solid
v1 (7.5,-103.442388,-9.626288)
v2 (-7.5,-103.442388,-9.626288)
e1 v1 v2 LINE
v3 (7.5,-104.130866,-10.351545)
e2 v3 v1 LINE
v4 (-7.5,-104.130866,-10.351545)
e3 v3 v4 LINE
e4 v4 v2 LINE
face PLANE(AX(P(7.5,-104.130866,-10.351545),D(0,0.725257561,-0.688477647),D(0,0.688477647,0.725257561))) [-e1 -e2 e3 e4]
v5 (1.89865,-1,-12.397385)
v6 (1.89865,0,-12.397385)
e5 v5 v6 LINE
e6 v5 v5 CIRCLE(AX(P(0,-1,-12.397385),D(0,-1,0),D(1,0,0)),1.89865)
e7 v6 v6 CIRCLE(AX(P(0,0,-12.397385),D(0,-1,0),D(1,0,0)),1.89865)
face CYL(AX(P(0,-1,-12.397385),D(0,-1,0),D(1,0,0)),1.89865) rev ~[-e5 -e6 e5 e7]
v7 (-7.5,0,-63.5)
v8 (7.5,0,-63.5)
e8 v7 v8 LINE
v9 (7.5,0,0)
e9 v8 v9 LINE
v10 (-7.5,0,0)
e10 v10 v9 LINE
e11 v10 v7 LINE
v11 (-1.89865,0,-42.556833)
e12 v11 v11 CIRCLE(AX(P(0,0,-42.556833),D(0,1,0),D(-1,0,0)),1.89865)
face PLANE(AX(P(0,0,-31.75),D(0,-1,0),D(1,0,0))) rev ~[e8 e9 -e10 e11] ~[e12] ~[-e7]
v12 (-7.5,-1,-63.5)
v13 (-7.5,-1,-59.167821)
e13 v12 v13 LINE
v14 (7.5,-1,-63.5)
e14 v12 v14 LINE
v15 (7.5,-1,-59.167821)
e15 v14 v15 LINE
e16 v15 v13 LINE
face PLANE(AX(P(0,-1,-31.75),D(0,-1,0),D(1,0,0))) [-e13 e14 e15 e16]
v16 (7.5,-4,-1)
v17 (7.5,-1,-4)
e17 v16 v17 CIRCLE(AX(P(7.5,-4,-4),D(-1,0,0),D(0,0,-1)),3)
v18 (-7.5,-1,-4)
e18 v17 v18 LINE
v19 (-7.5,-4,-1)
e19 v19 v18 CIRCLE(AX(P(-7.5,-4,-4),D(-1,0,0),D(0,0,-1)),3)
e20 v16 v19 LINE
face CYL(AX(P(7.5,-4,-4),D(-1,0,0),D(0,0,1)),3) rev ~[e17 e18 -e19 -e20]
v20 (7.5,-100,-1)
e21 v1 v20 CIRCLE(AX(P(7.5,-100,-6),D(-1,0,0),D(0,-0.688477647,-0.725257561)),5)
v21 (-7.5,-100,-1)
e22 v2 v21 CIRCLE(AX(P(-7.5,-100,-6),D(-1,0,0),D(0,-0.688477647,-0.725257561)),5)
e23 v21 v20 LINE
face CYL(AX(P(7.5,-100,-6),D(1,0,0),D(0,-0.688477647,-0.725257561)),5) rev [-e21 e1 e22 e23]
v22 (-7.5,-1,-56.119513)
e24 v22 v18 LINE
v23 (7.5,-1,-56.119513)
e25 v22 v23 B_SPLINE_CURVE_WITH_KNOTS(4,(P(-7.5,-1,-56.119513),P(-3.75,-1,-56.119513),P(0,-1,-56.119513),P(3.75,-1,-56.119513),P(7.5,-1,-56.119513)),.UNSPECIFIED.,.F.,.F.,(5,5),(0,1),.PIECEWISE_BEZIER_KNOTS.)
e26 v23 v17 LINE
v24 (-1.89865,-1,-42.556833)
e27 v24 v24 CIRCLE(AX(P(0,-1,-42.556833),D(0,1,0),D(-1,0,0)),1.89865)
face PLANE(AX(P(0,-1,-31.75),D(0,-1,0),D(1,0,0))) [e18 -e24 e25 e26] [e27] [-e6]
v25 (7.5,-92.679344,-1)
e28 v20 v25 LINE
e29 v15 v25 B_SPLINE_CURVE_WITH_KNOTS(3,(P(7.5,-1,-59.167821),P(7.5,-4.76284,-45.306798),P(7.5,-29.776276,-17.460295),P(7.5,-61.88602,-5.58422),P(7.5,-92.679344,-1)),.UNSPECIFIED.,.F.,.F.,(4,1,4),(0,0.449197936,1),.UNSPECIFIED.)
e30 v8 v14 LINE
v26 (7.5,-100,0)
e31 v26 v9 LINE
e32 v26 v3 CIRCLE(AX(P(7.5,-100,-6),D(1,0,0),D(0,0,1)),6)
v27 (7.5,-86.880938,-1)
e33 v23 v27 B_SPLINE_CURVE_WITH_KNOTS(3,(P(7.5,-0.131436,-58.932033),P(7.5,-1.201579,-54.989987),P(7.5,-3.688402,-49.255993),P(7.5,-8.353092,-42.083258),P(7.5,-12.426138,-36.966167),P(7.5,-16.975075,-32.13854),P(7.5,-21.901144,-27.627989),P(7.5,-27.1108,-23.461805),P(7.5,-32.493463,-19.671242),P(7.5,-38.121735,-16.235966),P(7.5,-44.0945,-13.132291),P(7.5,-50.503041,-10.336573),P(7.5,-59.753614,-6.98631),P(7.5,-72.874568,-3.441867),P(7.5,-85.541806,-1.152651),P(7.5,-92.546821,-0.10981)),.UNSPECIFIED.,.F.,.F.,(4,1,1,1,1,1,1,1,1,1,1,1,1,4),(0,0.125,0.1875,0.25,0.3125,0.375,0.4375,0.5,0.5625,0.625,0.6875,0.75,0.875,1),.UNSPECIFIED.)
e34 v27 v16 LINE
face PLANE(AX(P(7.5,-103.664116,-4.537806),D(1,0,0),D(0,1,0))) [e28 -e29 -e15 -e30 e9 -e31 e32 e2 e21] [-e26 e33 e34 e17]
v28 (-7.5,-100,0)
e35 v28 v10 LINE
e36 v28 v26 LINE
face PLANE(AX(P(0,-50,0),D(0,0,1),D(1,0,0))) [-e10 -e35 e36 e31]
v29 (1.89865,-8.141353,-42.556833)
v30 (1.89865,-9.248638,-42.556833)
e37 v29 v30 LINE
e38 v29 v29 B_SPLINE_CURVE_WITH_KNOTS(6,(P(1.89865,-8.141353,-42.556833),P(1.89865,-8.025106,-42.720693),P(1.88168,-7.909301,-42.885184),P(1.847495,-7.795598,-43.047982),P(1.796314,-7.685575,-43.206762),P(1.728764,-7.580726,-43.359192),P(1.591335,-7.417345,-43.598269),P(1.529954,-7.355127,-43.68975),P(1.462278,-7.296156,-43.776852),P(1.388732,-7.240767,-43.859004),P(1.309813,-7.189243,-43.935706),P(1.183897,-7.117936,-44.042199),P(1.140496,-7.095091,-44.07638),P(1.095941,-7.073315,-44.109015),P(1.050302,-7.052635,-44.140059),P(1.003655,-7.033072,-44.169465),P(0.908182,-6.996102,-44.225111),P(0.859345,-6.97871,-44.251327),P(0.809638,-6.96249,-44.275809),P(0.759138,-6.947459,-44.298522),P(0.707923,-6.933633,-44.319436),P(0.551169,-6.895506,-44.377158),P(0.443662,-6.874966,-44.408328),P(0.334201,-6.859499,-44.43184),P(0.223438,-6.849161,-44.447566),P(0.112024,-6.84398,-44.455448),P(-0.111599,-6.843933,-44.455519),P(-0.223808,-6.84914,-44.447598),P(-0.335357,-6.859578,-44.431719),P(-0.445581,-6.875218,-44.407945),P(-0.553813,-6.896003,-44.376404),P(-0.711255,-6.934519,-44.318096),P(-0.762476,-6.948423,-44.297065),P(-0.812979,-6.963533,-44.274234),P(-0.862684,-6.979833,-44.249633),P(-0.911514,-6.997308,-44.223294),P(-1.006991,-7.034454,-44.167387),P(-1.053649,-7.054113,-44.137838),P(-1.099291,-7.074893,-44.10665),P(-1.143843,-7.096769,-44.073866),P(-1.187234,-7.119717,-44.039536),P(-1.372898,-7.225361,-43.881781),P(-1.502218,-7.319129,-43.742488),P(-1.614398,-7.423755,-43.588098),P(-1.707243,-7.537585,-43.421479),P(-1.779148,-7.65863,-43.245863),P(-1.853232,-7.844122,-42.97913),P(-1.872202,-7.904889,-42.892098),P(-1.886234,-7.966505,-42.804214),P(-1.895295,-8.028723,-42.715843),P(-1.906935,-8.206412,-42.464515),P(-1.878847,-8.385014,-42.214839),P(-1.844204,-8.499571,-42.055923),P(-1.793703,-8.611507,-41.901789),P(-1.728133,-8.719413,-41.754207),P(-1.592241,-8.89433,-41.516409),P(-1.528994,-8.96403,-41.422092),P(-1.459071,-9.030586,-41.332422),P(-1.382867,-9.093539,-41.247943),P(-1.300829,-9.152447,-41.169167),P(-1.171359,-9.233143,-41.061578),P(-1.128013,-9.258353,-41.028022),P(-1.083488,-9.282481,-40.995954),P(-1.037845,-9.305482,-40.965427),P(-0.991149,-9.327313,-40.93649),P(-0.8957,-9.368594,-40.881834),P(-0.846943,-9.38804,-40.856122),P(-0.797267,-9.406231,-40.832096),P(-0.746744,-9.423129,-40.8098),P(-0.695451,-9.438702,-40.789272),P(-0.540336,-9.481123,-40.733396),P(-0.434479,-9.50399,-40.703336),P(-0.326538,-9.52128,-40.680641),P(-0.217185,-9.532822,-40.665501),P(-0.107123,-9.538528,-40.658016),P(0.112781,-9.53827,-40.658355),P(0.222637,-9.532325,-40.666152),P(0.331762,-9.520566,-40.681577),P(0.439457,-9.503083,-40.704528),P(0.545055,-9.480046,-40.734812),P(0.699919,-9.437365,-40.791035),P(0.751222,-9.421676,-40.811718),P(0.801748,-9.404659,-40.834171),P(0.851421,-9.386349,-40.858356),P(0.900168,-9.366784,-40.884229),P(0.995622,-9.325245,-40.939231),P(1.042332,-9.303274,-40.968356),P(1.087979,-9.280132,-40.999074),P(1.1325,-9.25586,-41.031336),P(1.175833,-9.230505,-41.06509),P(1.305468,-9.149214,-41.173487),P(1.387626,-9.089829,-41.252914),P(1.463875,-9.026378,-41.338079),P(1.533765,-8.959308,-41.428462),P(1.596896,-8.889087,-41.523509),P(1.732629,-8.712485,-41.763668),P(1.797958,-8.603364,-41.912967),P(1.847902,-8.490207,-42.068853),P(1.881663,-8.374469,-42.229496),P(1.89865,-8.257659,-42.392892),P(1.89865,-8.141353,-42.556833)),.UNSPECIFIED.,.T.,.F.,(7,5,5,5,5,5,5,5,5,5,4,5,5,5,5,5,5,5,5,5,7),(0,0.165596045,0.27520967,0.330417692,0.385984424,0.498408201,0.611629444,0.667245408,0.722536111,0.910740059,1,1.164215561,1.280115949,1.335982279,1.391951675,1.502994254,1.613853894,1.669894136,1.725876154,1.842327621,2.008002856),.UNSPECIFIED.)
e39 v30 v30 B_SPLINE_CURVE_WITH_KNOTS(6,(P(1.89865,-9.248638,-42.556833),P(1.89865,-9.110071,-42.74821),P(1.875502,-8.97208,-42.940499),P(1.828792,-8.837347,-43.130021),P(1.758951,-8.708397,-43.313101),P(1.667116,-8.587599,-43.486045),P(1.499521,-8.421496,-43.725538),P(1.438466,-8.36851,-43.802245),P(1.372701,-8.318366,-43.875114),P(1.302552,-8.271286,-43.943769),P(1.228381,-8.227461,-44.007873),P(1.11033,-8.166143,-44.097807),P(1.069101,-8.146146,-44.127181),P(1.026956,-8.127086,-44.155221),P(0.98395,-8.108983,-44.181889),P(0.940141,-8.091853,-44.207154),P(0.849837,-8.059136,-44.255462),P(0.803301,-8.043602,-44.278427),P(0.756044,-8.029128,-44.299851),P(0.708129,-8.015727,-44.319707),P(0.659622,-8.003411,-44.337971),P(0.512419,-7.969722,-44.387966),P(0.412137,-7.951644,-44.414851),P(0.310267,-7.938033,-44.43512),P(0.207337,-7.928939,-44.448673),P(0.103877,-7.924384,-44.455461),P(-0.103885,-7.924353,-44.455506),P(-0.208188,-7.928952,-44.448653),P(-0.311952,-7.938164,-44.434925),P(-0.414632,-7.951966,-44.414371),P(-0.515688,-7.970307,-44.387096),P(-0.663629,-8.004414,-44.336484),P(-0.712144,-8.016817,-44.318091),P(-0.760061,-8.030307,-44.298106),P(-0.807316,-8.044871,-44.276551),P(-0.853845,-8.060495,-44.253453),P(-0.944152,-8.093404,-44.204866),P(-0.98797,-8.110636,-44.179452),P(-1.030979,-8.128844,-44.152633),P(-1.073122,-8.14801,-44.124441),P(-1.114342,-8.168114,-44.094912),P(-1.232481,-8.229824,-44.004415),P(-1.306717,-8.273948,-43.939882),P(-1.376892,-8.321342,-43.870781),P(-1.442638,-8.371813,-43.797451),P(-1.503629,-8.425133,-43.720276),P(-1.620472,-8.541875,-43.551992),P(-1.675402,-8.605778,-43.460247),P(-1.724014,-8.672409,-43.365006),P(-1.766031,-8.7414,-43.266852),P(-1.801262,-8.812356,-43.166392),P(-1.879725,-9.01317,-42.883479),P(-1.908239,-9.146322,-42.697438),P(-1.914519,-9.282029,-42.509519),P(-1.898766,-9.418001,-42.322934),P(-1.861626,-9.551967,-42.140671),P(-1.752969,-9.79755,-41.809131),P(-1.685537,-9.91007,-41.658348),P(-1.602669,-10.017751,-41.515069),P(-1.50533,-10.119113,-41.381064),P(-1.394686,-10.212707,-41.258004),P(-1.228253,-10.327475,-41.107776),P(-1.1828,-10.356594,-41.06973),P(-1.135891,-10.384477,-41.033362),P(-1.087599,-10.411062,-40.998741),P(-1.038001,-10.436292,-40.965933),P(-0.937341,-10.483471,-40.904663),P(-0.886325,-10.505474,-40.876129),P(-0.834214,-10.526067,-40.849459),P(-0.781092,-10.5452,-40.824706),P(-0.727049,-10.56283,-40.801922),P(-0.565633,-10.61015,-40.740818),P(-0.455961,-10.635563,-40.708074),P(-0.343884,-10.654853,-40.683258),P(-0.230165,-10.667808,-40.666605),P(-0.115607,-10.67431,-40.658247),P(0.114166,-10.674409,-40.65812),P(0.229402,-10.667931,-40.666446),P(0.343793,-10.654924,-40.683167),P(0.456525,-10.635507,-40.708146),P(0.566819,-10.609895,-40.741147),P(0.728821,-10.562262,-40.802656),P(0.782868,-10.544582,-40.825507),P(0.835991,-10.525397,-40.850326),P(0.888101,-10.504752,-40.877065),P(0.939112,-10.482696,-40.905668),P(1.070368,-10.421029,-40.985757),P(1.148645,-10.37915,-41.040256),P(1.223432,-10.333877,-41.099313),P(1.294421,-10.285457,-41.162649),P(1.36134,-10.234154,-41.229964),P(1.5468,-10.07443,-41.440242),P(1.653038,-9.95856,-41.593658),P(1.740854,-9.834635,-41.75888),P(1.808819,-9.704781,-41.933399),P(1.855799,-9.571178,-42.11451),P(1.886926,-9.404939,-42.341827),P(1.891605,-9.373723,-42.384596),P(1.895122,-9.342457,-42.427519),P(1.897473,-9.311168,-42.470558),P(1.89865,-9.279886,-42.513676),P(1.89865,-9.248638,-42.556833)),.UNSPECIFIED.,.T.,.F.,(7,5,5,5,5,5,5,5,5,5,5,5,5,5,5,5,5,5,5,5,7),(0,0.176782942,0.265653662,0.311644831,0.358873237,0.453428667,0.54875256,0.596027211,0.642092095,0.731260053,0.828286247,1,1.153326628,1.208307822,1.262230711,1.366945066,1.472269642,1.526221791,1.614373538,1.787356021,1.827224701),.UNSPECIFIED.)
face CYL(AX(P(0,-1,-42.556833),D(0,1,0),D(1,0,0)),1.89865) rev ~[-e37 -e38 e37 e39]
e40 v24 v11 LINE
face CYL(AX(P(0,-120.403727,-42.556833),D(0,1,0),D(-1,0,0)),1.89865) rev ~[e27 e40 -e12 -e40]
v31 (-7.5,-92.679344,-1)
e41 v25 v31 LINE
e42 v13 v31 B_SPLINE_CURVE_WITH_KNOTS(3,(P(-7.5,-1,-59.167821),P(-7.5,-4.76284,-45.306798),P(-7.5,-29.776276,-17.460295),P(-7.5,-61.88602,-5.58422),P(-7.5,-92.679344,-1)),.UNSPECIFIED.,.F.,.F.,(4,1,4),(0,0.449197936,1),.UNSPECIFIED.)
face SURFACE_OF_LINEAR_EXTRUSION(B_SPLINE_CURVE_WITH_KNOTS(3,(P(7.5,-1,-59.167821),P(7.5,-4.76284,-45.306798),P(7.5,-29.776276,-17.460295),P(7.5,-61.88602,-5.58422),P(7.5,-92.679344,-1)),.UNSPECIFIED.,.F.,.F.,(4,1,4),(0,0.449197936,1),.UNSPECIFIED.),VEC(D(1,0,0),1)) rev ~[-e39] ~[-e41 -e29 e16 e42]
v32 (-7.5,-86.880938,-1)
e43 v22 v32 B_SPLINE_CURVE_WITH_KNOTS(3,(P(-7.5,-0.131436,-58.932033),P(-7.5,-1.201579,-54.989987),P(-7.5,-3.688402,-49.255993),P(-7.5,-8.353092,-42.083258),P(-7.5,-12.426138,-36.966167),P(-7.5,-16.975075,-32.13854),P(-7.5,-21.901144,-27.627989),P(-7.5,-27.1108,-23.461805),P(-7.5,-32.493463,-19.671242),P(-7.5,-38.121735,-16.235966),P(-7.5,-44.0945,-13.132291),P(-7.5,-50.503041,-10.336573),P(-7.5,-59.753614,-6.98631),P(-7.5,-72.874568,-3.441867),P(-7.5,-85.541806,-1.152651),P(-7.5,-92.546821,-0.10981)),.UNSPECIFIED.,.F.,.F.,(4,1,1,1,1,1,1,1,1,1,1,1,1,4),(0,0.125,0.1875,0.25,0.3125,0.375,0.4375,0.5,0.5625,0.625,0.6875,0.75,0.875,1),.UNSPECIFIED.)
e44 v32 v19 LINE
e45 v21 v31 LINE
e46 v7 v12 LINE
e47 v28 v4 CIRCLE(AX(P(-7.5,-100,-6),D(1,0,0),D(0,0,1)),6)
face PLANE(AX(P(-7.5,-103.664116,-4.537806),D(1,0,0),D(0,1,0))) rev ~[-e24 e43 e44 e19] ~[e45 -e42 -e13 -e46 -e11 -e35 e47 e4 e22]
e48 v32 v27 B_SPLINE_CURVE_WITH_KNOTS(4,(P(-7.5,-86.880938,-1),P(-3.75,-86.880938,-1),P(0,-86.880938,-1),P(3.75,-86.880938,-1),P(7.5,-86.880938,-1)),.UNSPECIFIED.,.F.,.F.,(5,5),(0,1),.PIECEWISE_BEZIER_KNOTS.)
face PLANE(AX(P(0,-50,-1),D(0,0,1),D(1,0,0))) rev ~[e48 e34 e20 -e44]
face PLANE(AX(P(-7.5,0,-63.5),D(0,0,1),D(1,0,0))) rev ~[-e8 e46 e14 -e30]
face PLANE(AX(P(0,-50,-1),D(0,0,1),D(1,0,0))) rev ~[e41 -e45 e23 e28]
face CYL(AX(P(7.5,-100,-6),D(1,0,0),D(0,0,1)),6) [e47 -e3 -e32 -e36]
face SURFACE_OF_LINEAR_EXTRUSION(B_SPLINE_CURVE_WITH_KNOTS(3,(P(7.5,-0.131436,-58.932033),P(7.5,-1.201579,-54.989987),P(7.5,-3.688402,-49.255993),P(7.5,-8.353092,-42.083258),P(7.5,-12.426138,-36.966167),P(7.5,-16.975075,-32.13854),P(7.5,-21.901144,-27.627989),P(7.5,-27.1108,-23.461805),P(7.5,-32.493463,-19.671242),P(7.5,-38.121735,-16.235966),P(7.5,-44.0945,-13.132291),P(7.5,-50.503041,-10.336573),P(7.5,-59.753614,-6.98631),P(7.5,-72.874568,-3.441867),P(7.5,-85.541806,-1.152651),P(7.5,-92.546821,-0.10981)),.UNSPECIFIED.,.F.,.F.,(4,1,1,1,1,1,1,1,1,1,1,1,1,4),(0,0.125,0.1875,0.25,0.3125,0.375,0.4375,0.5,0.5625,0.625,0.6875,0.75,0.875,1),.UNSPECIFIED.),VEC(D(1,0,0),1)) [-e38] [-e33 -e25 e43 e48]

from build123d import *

# Parameters (mm, degrees)
F0_W      = 15
F0_H      = 63.5
F1_DEPTH  = 1
F2_W      = 15
F2_H      = 100
F3_DEPTH  = 1
F5_DEPTH  = 15
F7_D      = 3.7973
F7_DEPTH  = 1.0010001
F8_D      = 3.7973
F8_DEPTH  = 99.0010001
F9_D      = 3.7973
F10_R     = 3
F12_DEPTH = 15


# Not quite as in the source:
# - the dataset's text gives a spline's control points without its knots; the knots are read off the source's solid


with BuildPart() as f1:
    # F0 (on Front) → F1 (new body)
    with BuildSketch(Plane.XZ):
        with Locations((0, -31.75)):
            Rectangle(F0_W, F0_H)
    extrude(amount=F1_DEPTH)

    # F2 (on Top) → F3 (join)
    with BuildSketch(Plane.XY):
        with Locations((0, -50)):
            Rectangle(F2_W, F2_H)
    extrude(amount=-F3_DEPTH)

    # F4 (on face) → F5 (join, through all)
    with BuildSketch(Plane.YZ.offset(7.5)):
        with BuildLine():
            add(Edge.make_bspline(
                [(-1, -59.1678209603), (-4.7628395259, -45.3067980707), (-29.7762758586, -17.4602950514), (-61.8860200047, -5.5842199363), (-92.6793441176, -1)],
                knots=[0, 0, 0, 0, 0.4491979362, 1, 1, 1, 1], degree=3))
            Line((-1, -59.1678209603), (-0.1314357545, -58.9320325989))
            add(Edge.make_bspline(
                [(-0.1314357545, -58.9320325989), (-1.2015793269, -54.989987117), (-3.6884016693, -49.2559925066), (-8.3530917512, -42.083257521), (-12.4261382193, -36.9661666224), (-16.9750747913, -32.1385398724), (-21.9011436861, -27.6279890298), (-27.1107997825, -23.4618046647), (-32.4934625877, -19.6712415186), (-38.1217352473, -16.235966274), (-44.0944999552, -13.1322911599), (-50.5030405646, -10.3365734857), (-59.7536135039, -6.9863101985), (-72.8745679903, -3.4418665365), (-85.5418056788, -1.1526510188), (-92.5468210682, -0.109810334)],
                knots=[0, 0, 0, 0, 0.125, 0.1875, 0.25, 0.3125, 0.375, 0.4375, 0.5, 0.5625, 0.625, 0.6875, 0.75, 0.875, 1, 1, 1, 1], degree=3))
            Line((-92.5468210682, -0.109810334), (-92.6793441176, -1))
        make_face()
    extrude(amount=-F5_DEPTH)

    # F7 (through all, one way)
    with BuildSketch(Plane.XZ.offset(1)):
        with Locations((0, -12.3973852023)):
            Circle(F7_D / 2)
    extrude(amount=-F7_DEPTH, mode=Mode.SUBTRACT)

    # F8 (through all, one way)
    with BuildSketch(Plane(origin=(0, -1, 0), x_dir=(1, 0, 0), z_dir=(0, 1, 0))):
        with Locations((0, 42.5568334758)):
            Circle(F8_D / 2)
    extrude(amount=-F8_DEPTH, mode=Mode.SUBTRACT)

    # F9 (through all)
    with Locations(Plane.XZ.offset(1)):
        with Locations((0, -42.5568334758)):
            Hole(F9_D / 2)

    # F10
    f10_edges = [f1.edges().sort_by_distance(p)[0] for p in [
        (0, -1, -1),
    ]]
    fillet(f10_edges, radius=F10_R)

    # F11 (on face) → F12 (join, through all)
    with BuildSketch(Plane.YZ.offset(7.5)):
        with BuildLine():
            Line((-100, -1), (-100, 0))
            ThreePointArc((-100, 0), (-105.5726686693, -3.7761825834), (-104.1308658813, -10.3515453659))
            Line((-104.1308658813, -10.3515453659), (-103.4423882344, -9.6262878049))
            ThreePointArc((-103.4423882344, -9.6262878049), (-104.6438905577, -4.1468188195), (-100, -1))
        make_face()
    extrude(amount=-F12_DEPTH)


solid = f1.part
